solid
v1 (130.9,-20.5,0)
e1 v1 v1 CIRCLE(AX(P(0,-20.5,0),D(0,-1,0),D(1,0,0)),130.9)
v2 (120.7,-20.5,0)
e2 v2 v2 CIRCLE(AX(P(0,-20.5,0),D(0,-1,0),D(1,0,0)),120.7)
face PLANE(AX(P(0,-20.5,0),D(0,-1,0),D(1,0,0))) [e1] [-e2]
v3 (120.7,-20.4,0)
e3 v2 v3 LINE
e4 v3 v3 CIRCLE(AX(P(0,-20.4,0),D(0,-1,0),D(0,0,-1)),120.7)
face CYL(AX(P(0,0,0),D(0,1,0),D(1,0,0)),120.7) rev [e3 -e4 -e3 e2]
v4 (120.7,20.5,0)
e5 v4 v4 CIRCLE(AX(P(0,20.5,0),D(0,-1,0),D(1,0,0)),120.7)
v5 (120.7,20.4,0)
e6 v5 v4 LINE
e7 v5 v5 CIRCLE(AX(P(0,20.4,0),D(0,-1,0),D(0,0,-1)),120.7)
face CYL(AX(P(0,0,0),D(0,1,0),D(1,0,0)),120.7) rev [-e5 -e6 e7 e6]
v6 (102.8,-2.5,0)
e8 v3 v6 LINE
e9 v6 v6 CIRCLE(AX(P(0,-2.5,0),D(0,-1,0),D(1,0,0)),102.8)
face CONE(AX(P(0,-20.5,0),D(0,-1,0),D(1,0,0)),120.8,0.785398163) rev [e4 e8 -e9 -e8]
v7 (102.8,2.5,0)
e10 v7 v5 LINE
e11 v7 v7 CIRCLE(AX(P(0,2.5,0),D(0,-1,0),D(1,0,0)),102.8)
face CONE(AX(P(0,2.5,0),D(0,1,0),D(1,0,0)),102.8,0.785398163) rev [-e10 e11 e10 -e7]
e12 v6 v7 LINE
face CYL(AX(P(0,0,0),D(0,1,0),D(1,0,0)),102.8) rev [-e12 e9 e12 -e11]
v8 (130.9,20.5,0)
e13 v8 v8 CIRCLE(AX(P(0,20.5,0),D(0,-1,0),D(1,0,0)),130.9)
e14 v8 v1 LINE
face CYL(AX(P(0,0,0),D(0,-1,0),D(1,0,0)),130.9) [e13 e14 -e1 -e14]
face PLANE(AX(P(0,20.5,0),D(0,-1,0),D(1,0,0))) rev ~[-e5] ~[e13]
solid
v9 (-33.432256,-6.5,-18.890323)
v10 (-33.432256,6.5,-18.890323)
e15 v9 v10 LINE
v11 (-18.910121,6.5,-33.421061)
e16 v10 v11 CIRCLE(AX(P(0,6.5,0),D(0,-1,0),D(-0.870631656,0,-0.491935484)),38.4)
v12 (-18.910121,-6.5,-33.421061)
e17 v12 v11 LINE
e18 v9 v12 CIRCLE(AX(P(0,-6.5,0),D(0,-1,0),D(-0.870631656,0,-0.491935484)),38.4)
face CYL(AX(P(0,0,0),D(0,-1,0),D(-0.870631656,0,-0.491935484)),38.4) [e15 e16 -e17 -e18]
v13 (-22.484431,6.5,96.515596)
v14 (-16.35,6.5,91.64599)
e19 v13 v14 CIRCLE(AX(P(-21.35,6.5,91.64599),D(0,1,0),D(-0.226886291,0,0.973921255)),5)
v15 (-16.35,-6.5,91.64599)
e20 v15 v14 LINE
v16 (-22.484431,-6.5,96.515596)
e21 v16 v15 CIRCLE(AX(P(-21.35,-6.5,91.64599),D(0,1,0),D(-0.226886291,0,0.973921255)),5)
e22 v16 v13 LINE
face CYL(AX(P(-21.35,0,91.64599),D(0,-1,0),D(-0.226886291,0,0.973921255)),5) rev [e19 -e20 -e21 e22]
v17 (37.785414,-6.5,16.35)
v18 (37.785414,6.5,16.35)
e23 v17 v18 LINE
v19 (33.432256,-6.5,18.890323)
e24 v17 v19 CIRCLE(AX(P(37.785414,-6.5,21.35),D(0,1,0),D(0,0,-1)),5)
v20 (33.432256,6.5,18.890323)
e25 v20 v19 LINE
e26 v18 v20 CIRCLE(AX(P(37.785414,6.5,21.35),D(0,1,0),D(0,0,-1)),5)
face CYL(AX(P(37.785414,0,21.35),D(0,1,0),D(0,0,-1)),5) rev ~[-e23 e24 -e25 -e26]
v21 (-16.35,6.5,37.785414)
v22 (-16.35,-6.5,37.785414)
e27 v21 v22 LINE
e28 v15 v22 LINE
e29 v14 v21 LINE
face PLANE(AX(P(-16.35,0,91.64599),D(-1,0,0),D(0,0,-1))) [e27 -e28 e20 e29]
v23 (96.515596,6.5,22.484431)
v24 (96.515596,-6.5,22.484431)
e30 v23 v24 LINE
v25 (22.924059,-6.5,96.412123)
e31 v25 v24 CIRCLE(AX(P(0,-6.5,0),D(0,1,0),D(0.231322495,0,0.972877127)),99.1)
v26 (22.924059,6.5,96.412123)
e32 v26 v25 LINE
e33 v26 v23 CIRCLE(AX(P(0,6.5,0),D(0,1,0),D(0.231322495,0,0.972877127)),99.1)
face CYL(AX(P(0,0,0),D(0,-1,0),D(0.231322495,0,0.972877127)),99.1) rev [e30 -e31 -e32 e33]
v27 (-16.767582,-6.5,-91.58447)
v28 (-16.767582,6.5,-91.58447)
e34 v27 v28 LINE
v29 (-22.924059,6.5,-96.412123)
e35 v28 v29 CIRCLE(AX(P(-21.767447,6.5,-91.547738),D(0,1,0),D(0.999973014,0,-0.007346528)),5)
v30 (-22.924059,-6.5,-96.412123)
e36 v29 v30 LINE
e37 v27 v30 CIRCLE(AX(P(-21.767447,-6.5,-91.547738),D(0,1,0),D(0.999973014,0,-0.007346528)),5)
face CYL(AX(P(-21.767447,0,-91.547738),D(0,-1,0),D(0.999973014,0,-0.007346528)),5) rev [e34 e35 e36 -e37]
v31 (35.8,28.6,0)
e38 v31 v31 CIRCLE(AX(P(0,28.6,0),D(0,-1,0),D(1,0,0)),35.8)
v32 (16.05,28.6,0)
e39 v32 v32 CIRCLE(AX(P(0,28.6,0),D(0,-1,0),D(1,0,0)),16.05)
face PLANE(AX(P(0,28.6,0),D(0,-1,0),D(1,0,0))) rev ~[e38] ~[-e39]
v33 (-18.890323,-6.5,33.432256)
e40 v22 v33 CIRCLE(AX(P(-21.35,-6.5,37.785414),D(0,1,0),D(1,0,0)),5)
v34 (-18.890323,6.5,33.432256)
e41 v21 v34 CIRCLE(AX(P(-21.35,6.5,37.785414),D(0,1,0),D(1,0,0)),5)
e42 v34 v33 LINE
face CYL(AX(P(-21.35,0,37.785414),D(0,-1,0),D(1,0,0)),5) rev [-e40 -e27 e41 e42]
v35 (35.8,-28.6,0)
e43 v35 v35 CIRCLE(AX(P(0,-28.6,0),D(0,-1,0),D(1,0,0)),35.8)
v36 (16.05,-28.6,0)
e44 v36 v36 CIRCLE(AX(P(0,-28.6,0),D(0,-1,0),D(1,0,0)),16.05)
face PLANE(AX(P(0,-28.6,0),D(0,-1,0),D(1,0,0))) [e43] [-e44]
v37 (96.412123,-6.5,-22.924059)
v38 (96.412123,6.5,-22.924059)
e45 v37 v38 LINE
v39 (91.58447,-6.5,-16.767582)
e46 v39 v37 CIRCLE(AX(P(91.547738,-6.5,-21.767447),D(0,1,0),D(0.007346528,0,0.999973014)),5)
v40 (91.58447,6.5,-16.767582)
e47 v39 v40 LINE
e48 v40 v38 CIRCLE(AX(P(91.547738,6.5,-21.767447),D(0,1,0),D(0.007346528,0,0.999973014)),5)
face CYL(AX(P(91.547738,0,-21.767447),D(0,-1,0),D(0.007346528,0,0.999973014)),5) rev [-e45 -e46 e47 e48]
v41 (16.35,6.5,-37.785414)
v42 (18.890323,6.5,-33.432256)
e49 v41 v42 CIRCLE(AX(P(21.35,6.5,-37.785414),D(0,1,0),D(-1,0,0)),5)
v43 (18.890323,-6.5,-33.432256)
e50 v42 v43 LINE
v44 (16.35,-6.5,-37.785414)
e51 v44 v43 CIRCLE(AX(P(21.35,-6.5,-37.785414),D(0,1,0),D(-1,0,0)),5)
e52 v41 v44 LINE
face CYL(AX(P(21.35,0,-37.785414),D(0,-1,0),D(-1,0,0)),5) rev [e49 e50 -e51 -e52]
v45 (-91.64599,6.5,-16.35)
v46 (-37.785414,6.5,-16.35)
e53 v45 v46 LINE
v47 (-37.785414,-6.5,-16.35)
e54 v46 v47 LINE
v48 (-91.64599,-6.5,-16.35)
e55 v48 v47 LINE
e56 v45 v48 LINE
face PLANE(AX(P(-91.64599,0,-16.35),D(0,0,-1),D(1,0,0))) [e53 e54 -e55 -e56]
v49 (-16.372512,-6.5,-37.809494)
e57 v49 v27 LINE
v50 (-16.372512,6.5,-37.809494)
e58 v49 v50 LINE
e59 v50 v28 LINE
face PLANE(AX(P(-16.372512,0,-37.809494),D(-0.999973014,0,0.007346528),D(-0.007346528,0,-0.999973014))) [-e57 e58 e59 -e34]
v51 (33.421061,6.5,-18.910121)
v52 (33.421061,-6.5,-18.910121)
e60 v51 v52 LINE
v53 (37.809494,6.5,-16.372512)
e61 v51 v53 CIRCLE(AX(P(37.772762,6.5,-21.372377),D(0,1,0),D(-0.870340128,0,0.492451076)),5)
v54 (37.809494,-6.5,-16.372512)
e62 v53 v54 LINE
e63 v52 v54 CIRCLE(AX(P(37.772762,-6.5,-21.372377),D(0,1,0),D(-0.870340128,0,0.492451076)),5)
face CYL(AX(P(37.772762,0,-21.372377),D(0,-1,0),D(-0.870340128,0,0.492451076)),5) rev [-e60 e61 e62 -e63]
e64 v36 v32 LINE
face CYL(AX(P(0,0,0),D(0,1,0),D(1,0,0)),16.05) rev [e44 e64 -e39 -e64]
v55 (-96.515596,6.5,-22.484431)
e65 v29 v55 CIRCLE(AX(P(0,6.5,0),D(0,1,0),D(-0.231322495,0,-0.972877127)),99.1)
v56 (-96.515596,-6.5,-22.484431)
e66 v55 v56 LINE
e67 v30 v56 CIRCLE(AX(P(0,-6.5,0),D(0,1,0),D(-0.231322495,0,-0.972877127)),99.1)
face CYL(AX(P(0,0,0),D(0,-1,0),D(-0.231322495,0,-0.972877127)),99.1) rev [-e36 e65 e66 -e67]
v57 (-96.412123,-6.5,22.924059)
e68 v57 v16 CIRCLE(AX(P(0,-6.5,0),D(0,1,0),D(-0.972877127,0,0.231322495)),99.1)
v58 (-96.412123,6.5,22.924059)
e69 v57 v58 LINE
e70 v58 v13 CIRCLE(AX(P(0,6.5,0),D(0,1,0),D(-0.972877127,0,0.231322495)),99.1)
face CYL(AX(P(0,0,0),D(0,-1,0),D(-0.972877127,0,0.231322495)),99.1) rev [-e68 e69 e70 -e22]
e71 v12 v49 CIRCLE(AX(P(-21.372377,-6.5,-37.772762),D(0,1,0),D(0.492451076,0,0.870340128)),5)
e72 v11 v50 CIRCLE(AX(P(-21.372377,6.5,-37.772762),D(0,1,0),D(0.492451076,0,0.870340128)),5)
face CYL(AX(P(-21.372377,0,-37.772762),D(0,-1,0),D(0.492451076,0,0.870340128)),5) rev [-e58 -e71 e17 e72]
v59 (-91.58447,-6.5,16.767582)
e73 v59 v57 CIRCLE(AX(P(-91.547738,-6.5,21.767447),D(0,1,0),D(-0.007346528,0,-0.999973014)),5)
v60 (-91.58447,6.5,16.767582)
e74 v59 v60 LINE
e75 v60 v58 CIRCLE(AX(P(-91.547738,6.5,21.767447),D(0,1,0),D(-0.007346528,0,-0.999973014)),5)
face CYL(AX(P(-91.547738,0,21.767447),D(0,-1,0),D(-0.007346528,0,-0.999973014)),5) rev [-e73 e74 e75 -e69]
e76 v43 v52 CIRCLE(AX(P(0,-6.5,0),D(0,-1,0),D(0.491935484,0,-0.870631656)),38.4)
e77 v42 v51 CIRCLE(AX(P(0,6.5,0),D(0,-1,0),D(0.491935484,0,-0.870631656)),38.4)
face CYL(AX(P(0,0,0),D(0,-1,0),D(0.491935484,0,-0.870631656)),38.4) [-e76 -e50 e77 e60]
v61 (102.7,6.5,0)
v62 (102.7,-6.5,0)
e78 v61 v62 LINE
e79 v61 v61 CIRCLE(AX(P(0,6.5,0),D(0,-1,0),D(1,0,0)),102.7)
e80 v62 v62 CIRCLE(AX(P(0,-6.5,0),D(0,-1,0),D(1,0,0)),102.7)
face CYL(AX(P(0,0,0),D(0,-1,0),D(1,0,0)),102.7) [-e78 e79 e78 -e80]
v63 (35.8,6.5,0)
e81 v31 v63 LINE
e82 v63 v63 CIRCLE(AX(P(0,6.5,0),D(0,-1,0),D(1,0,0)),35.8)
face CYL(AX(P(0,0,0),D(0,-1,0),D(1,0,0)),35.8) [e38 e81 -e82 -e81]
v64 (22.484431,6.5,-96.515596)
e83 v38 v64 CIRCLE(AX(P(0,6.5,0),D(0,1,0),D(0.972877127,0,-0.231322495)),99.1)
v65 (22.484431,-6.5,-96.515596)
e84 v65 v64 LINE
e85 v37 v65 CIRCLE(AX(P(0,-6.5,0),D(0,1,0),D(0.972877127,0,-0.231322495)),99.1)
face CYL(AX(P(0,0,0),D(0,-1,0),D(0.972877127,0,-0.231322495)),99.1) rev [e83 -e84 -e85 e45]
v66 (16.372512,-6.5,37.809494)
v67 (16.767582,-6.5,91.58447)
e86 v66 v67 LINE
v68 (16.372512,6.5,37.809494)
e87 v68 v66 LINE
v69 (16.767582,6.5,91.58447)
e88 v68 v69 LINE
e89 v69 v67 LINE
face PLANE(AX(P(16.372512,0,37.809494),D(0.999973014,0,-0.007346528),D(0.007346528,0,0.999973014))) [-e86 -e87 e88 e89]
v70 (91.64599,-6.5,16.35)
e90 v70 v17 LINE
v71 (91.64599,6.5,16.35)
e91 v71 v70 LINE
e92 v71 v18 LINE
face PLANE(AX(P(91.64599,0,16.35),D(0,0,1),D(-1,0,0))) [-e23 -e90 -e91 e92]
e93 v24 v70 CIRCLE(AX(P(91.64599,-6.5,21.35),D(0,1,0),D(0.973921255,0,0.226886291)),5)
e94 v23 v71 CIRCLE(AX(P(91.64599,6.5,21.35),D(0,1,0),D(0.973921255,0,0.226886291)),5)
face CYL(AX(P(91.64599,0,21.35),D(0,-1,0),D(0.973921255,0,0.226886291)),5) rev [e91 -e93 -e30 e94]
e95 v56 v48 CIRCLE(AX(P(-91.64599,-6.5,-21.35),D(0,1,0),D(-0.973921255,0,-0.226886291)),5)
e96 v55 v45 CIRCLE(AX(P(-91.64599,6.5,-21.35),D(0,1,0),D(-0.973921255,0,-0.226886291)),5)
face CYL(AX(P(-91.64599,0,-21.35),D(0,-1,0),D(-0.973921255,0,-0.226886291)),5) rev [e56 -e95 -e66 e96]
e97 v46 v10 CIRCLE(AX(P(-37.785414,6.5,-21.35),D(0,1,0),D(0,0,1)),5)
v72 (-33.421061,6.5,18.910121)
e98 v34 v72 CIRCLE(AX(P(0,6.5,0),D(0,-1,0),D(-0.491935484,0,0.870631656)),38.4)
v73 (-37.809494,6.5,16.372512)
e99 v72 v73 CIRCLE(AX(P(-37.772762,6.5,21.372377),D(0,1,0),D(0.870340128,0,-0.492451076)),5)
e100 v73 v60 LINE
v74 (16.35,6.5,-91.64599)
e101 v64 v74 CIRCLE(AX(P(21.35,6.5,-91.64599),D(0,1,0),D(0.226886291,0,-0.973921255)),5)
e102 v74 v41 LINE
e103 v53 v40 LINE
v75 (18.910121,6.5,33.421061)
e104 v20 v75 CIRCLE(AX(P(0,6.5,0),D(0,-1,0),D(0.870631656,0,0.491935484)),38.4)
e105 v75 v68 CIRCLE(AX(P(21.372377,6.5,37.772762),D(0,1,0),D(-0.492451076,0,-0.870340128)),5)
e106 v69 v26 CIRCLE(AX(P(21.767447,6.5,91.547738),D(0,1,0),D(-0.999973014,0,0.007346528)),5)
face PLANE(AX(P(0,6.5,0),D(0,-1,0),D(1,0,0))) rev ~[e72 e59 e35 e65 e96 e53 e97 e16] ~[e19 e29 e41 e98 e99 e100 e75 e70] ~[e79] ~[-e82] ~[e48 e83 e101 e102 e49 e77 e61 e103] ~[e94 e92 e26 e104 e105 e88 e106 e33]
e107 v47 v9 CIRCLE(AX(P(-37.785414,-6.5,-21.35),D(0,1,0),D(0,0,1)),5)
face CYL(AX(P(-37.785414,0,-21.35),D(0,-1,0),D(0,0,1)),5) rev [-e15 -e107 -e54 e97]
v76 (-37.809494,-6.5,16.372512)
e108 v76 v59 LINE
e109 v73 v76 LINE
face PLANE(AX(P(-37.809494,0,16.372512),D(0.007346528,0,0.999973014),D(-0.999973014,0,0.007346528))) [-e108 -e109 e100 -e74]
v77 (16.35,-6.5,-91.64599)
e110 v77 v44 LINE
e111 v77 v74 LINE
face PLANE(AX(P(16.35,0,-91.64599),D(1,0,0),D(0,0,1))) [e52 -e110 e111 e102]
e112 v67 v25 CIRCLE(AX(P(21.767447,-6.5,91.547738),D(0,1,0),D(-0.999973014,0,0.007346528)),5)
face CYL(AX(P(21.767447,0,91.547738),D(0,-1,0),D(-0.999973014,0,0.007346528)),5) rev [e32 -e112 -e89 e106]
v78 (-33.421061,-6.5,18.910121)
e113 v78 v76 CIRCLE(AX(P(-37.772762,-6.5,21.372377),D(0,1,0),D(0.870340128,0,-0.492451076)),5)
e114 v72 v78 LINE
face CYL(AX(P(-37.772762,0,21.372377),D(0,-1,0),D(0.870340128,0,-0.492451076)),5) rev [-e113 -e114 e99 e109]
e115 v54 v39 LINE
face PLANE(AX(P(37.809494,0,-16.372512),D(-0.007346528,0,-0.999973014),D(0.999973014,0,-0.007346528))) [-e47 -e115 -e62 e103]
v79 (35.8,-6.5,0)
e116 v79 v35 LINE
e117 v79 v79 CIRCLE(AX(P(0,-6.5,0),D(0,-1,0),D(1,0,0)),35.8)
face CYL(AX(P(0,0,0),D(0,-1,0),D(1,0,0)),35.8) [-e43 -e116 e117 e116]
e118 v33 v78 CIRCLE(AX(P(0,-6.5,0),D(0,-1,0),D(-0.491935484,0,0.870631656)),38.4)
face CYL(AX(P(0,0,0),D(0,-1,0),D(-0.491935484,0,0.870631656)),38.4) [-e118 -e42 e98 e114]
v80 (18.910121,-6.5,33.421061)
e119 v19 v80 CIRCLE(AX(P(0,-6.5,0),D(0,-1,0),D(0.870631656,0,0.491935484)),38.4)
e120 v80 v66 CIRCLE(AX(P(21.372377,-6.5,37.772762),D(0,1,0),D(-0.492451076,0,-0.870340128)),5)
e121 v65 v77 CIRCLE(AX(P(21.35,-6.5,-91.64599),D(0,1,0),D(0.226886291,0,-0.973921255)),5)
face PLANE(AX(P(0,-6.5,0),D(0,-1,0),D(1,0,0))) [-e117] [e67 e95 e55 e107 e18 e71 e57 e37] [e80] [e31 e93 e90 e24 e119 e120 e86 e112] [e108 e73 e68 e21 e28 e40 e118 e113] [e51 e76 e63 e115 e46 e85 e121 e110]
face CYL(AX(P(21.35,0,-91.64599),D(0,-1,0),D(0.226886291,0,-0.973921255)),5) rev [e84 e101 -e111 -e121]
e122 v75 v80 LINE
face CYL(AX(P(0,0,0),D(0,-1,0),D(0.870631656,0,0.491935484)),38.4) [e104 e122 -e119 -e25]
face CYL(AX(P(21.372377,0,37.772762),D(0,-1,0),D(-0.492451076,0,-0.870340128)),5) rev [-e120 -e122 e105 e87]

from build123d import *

# Parameters (mm, degrees)
F0_R     = 102.7
F0_R_2   = 35.8
F1_DEPTH = 6.5
F0_R_3   = 16.05
F2_DEPTH = 28.6
F3_R     = 120.7
F3_R_2   = 102.8
F4_DEPTH = 20.5
F3_R_3   = 130.9
F6_DEPTH = 20.5


# Not quite as in the source:
# - a fillet or chamfer that OpenCascade refuses, or shapes differently, is made with other operations: its cross-section is extruded or revolved along the edge and cut away or added


with BuildPart() as f1:
    # F0 (on Front) → F1 (new body, symmetric)
    with BuildSketch(Plane.XZ):
        Circle(F0_R)
        with BuildLine():
            ThreePointArc((-22.9240592059, -96.4121232497), (-70.2337791547, -69.9144210135), (-96.5155963671, -22.4844314559))
            ThreePointArc((-96.5155963671, -22.4844314559), (-95.5621206621, -18.2413151719), (-91.6459900923, -16.35))
            Line((-91.6459900923, -16.35), (-37.7854138524, -16.35))
            ThreePointArc((-37.7854138524, -16.35), (-35.2653332086, -17.031528795), (-33.4322555745, -18.8903225806))
            ThreePointArc((-33.4322555745, -18.8903225806), (-27.1609405883, -27.1448578253), (-18.9101213144, -33.4210609029))
            ThreePointArc((-18.9101213144, -33.4210609029), (-17.0439362056, -35.2698426574), (-16.3725116244, -37.8094941823))
            Line((-16.3725116244, -37.8094941823), (-16.7675816639, -91.5844702575))
            ThreePointArc((-16.7675816639, -91.5844702575), (-18.682125683, -95.4823016351), (-22.9240592059, -96.4121232497))
        make_face(mode=Mode.SUBTRACT)
        Circle(F0_R_2, mode=Mode.SUBTRACT)
        with BuildLine():
            ThreePointArc((16.35, -37.7854138524), (17.031528795, -35.2653332086), (18.8903225806, -33.4322555745))
            ThreePointArc((18.8903225806, -33.4322555745), (27.1448578253, -27.1609405883), (33.4210609029, -18.9101213144))
            ThreePointArc((33.4210609029, -18.9101213144), (35.2698426574, -17.0439362056), (37.8094941823, -16.3725116244))
            Line((37.8094941823, -16.3725116244), (91.5844702575, -16.7675816639))
            ThreePointArc((91.5844702575, -16.7675816639), (95.4823016351, -18.682125683), (96.4121232497, -22.9240592059))
            ThreePointArc((96.4121232497, -22.9240592059), (69.9144210135, -70.2337791547), (22.4844314559, -96.5155963671))
            ThreePointArc((22.4844314559, -96.5155963671), (18.2413151719, -95.5621206621), (16.35, -91.6459900923))
            Line((16.35, -91.6459900923), (16.35, -37.7854138524))
        make_face(mode=Mode.SUBTRACT)
        with BuildLine():
            ThreePointArc((-16.35, 37.7854138524), (-17.031528795, 35.2653332086), (-18.8903225806, 33.4322555745))
            ThreePointArc((-18.8903225806, 33.4322555745), (-27.1448578253, 27.1609405883), (-33.4210609029, 18.9101213144))
            ThreePointArc((-33.4210609029, 18.9101213144), (-35.2698426574, 17.0439362056), (-37.8094941823, 16.3725116244))
            Line((-37.8094941823, 16.3725116244), (-91.5844702575, 16.7675816639))
            ThreePointArc((-91.5844702575, 16.7675816639), (-95.4823016351, 18.682125683), (-96.4121232497, 22.9240592059))
            ThreePointArc((-96.4121232497, 22.9240592059), (-69.9144210135, 70.2337791547), (-22.4844314559, 96.5155963671))
            ThreePointArc((-22.4844314559, 96.5155963671), (-18.2413151719, 95.5621206621), (-16.35, 91.6459900923))
            Line((-16.35, 91.6459900923), (-16.35, 37.7854138524))
        make_face(mode=Mode.SUBTRACT)
        with BuildLine():
            ThreePointArc((37.7854138524, 16.35), (35.2653332086, 17.031528795), (33.4322555745, 18.8903225806))
            ThreePointArc((33.4322555745, 18.8903225806), (27.1609405883, 27.1448578253), (18.9101213144, 33.4210609029))
            ThreePointArc((18.9101213144, 33.4210609029), (17.0439362056, 35.2698426574), (16.3725116244, 37.8094941823))
            Line((16.3725116244, 37.8094941823), (16.7675816639, 91.5844702575))
            ThreePointArc((16.7675816639, 91.5844702575), (18.682125683, 95.4823016351), (22.9240592059, 96.4121232497))
            ThreePointArc((22.9240592059, 96.4121232497), (70.2337791547, 69.9144210135), (96.5155963671, 22.4844314559))
            ThreePointArc((96.5155963671, 22.4844314559), (95.5621206621, 18.2413151719), (91.6459900923, 16.35))
            Line((91.6459900923, 16.35), (37.7854138524, 16.35))
        make_face(mode=Mode.SUBTRACT)
    extrude(amount=F1_DEPTH, both=True)

    # F0 (on Front) → F2 (join, symmetric)
    with BuildSketch(Plane.XZ):
        Circle(F0_R_2)
        Circle(F0_R_3, mode=Mode.SUBTRACT)
    extrude(amount=F2_DEPTH, both=True)


with BuildPart() as f4:
    # F3 (on Front) → F4 (new body, symmetric)
    with BuildSketch(Plane.XZ):
        Circle(F3_R)
        Circle(F3_R_2, mode=Mode.SUBTRACT)
    extrude(amount=F4_DEPTH, both=True)

    # F5: chamfer of 18 on 3 edges, made by hand

    # F5_s1 → F5_t2 (revolve, cut)
    with BuildSketch(Plane.XY):
        Polygon((120.8, -20.5), (102.8, -2.5), (102.8, -20.5), align=None)
    revolve(axis=Axis((0, -20.5, 0), (0, -1, 0)), mode=Mode.SUBTRACT)

    # F5_s3 → F5_t4 (revolve, cut)
    with BuildSketch(Plane.XY):
        Polygon((102.8, 2.5), (120.8, 20.5), (102.8, 20.5), align=None)
    revolve(axis=Axis((0, 20.5, 0), (0, -1, 0)), mode=Mode.SUBTRACT)

    # F3 (on Front) → F6 (join, symmetric)
    with BuildSketch(Plane.XZ):
        Circle(F3_R_3)
        Circle(F3_R, mode=Mode.SUBTRACT)
    extrude(amount=F6_DEPTH, both=True)


solid = Compound([f1.part, f4.part])
